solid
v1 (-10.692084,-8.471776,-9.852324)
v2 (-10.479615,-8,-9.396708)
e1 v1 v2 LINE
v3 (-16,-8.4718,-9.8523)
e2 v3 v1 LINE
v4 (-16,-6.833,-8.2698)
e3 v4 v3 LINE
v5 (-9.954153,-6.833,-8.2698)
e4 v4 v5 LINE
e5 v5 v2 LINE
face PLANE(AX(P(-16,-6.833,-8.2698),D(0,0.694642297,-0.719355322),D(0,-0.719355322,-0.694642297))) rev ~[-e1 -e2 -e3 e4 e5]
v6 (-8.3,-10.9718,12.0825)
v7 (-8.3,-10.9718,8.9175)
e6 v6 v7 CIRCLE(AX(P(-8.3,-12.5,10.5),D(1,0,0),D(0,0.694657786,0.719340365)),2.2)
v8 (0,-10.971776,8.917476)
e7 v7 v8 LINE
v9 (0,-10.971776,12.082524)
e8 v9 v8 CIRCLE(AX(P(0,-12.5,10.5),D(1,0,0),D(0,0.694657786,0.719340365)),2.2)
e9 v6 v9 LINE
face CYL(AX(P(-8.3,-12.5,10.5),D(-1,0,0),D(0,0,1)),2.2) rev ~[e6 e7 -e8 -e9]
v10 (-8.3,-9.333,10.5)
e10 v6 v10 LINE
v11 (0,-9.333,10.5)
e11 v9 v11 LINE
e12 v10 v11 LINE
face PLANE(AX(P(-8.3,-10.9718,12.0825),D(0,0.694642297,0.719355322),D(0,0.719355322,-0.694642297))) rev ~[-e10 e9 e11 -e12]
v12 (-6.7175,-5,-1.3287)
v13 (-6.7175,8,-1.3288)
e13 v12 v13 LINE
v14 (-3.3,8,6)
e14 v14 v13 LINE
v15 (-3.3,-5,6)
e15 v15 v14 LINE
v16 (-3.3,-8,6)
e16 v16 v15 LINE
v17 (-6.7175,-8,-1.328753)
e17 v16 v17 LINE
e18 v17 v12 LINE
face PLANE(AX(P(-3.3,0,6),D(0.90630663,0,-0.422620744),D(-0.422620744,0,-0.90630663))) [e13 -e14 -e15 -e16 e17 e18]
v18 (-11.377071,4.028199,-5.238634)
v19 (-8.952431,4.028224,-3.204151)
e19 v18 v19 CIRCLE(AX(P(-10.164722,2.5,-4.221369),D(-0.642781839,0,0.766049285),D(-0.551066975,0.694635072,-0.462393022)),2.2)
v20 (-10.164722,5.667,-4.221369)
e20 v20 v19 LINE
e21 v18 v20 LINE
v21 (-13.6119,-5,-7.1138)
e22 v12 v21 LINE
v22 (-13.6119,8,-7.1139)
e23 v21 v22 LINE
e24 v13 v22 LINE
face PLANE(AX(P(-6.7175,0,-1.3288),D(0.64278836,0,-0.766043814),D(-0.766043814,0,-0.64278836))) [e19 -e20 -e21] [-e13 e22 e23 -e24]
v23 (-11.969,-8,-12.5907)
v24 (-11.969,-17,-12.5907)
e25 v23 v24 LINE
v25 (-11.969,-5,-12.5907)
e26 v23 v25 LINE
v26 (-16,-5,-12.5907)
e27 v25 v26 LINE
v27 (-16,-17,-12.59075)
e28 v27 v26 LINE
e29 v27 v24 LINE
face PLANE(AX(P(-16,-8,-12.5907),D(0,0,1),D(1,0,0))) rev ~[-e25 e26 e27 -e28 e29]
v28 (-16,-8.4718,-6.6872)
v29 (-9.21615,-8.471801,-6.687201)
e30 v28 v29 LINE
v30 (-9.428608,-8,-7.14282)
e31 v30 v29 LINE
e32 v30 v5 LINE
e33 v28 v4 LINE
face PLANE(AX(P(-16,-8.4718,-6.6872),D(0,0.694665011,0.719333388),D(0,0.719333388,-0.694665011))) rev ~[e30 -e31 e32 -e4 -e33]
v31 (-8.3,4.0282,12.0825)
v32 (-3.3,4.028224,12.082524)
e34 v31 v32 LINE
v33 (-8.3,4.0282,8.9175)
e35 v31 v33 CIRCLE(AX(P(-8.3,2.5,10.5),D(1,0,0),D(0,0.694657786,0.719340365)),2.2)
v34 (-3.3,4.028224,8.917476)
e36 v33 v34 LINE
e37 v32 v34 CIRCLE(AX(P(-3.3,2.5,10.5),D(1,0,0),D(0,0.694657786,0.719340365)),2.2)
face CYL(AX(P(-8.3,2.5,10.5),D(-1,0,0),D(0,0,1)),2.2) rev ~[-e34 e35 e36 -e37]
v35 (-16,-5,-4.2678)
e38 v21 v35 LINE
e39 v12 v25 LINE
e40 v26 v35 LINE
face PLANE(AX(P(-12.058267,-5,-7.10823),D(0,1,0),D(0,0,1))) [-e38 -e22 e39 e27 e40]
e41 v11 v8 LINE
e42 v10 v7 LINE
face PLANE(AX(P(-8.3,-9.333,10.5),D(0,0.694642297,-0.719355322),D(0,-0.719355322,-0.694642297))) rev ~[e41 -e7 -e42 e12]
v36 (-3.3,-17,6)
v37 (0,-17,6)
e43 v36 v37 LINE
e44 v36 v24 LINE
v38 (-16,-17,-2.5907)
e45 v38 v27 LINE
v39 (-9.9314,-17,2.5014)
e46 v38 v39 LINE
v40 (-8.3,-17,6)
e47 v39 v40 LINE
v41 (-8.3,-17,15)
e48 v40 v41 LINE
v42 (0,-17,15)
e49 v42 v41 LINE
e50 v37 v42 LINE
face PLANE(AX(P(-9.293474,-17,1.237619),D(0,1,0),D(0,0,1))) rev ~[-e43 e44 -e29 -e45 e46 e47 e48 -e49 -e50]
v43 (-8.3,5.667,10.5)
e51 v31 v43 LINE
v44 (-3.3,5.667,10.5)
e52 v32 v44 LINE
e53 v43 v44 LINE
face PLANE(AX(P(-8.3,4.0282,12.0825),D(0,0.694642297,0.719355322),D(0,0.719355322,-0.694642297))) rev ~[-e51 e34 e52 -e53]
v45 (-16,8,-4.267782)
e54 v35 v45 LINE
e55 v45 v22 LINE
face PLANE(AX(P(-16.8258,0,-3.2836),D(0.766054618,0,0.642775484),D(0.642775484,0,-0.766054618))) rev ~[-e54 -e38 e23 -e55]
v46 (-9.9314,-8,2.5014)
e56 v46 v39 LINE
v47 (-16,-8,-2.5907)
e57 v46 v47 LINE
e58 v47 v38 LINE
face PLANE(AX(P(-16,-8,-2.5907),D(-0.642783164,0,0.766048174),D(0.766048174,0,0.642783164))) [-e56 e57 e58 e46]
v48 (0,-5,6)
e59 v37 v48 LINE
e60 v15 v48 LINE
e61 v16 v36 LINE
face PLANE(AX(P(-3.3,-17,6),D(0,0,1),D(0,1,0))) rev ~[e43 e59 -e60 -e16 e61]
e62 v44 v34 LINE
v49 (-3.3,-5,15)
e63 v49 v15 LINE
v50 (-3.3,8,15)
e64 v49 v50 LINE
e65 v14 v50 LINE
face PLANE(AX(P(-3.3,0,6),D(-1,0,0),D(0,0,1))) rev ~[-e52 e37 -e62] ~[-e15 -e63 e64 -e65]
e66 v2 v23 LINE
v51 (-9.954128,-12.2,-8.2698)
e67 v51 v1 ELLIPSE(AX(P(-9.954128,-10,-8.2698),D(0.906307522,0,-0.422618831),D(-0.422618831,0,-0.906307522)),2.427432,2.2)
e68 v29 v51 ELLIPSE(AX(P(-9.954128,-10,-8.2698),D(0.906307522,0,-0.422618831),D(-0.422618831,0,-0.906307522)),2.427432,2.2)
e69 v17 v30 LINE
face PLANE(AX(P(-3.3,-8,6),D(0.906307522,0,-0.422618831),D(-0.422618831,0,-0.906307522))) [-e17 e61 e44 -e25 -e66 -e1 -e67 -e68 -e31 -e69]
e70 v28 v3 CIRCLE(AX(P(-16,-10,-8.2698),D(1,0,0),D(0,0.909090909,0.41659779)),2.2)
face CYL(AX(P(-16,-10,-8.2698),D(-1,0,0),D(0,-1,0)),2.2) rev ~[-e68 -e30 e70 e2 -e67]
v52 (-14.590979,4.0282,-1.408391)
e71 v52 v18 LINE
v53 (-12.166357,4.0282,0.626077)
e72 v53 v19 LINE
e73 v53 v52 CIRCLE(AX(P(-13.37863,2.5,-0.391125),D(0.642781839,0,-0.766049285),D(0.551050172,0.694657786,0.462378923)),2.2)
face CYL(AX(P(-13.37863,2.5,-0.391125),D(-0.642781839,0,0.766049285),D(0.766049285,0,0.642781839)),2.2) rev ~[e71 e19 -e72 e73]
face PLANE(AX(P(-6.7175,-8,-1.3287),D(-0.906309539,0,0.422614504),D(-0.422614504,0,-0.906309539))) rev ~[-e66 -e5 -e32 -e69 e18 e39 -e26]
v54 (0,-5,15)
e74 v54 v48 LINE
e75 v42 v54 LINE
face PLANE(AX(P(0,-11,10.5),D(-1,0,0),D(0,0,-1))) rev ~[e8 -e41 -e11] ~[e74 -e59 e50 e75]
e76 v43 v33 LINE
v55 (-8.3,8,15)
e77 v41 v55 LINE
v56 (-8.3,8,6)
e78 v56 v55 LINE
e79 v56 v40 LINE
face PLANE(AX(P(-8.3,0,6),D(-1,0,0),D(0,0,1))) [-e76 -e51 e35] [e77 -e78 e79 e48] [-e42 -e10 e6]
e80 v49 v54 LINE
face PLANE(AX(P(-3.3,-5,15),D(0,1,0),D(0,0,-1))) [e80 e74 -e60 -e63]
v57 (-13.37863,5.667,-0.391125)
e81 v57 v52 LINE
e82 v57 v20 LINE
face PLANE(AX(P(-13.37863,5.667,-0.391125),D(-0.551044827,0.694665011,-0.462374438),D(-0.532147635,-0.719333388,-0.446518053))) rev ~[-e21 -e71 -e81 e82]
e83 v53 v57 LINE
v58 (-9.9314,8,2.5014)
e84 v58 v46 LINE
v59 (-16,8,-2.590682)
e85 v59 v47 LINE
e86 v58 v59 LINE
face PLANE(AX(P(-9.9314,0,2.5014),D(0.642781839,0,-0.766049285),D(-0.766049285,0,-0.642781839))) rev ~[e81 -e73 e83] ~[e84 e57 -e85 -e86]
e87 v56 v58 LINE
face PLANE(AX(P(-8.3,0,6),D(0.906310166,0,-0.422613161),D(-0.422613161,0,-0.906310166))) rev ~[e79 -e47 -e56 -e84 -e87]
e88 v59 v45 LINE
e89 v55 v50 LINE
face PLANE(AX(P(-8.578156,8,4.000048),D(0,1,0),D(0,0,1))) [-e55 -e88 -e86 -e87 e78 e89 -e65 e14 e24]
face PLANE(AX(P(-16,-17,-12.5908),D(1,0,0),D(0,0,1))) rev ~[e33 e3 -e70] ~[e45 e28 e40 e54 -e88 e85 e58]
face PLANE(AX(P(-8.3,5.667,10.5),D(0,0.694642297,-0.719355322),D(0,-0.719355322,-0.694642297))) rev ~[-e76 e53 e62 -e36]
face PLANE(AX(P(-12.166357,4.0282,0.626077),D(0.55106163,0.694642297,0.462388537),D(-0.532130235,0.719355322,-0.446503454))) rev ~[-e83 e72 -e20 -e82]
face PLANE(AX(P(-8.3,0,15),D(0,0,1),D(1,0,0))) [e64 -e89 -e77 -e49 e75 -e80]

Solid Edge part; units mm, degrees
sketch "Sketch1" plane through (0, 0, 0) normal (0, -1, 0) x (1, 0, 0)
  line L0 (-8.3, 6) -> (-8.3, 15)
  line L1 (-8.3, 15) -> (-3.3, 15)
  line L2 (-3.3, 6) -> (-3.3, 15)
  line L3 (-3.3, 6) -> (-6.7175, -1.3288)
  line L4 (-6.7175, -1.3288) -> (-13.6119, -7.1139)
  line L5 (-16.8258, -3.2836) -> (-13.6119, -7.1139)
  line L6 (-9.9314, 2.5014) -> (-16.8258, -3.2836)
  line L7 (-8.3, 6) -> (-9.9314, 2.5014)
extrude "ExtrudedProtrusion_1" add sketch "Sketch1" along normal mid plane 16
sketch "Sketch2" plane through (0, -8, 0) normal (0, -1, 0) x (1, 0, 0)
  line L0 (-8.3, 15) -> (-3.3, 15)
  line L1 (-3.3, 6) -> (-3.3, 15)
  line L2 (-3.3, 6) -> (-11.969, -12.5907)
  line L3 (-16, -12.5907) -> (-11.969, -12.5907)
  line L4 (-16, -2.5907) -> (-16, -12.5907)
  line L5 (-16, -2.5907) -> (-9.9314, 2.5014)
  line L6 (-9.9314, 2.5014) -> (-8.3, 6)
  line L7 (-8.3, 6) -> (-8.3, 15)
extrude "Protrusion1" add sketch "Sketch2" along normal blind 9
sketch "Sketch3" plane through (-16, -11.5, 1.2046) normal (-1, 0, 0) x (0, -1, 0)
  circle A0 centre (-1.5, -9.4744) radius 2.2
  dimension "D1" = 7
extrude "Cutout1" cut sketch "Sketch3" against normal through all
sketch "Sketch4" plane through (-11.3587, -8, -6.9597) normal (0, 1, 0) x (0, 0, 1)
  line L0 (-5.631, -0.6103) -> (-5.631, -4.6413)
  line L1 (-5.631, -4.6413) -> (2.6919, -4.6413)
  line L2 (-0.1541, -2.2532) -> (2.6919, -4.6413)
  line L3 (5.631, 4.6412) -> (-0.1541, -2.2532)
  line L4 (5.631, 4.6412) -> (-5.631, -0.6103)
extrude "ExtrudedProtrusion_5" add sketch "Sketch4" along normal blind 3
sketch "Sketch5" plane through (-9.65, -17, 1.2046) normal (0, -1, 0) x (1, 0, 0)
  line L0 (-6.35, -13.7954) -> (-6.35, 13.7954)
extrude "Cutout2" cut sketch "Sketch5" against normal through all material side at (-16.05, -17, 1.2046)
sketch "Sketch6" plane through (-12.9657, -4.5, -0.0447) normal (-0.6427876, 0, 0.7660444) x (0.7660444, 0, 0.6427876)
  circle A0 centre (-0.539, 7) radius 2.2
  dimension "D1" = 5.5
extrude "Cutout3" cut sketch "Sketch6" against normal through all
sketch "Sketch7" plane through (-12.9657, -4.5, -0.0447) normal (-0.6427876, 0, 0.7660444) x (0.7660444, 0, 0.6427876)
  line L0 (-0.539, 7) -> (1.0435, 8.5282)
  line L1 (1.0435, 8.5282) -> (-0.539, 10.167)
  line L2 (-0.539, 10.167) -> (-2.1216, 8.5282)
  line L3 (-2.1216, 8.5282) -> (-0.539, 7)
extrude "Cutout4" cut sketch "Sketch7" against normal through all
sketch "Sketch8" plane through (-16, -4.5, -7.5907) normal (-1, 0, 0) x (0, 0, 1)
  line L0 (-0.6791, -5.5) -> (0.9035, -3.9718)
  line L1 (0.9035, -3.9718) -> (-0.6791, -2.333)
  line L2 (-0.6791, -2.333) -> (-2.2616, -3.9718)
  line L3 (-2.2616, -3.9718) -> (-0.6791, -5.5)
extrude "Cutout5" cut sketch "Sketch8" against normal through all
sketch "Sketch9" plane through (-3.3, -4.5, 10.5) normal (1, 0, 0) x (0, 0, -1)
  line L0 (4.5, -12.5) -> (-4.5, -12.5)
  line L1 (-4.5, -12.5) -> (-4.5, -0.5)
  line L2 (-4.5, -0.5) -> (4.5, -0.5)
  line L3 (4.5, -12.5) -> (4.5, -0.5)
  dimension "D1" = 12
extrude "ExtrudedProtrusion_4" add sketch "Sketch9" along normal blind 3.3
sketch "Sketch10" plane through (-8.3, -4.5, 10.5) normal (-1, 0, 0) x (0, 0, 1)
  circle A0 centre (0, 7) radius 2.2
  circle A1 centre (0, -8) radius 2.2
  dimension "D1" = 15
  dimension "D2" = 5.5
extrude "Cutout6" cut sketch "Sketch10" against normal through all
sketch "Sketch11" plane through (-8.3, -4.5, 10.5) normal (-1, 0, 0) x (0, 0, 1)
  line L0 (0, 7) -> (1.5825, 8.5282)
  line L1 (1.5825, 8.5282) -> (0, 10.167)
  line L2 (0, 10.167) -> (-1.5825, 8.5282)
  line L3 (-1.5825, 8.5282) -> (0, 7)
  line L4 (0, -8) -> (1.5825, -6.4718)
  line L5 (1.5825, -6.4718) -> (0, -4.833)
  line L6 (0, -4.833) -> (-1.5825, -6.4718)
  line L7 (-1.5825, -6.4718) -> (0, -8)
extrude "Cutout7" cut sketch "Sketch11" against normal through all
properties material "ABS Plastic, medium impact"
